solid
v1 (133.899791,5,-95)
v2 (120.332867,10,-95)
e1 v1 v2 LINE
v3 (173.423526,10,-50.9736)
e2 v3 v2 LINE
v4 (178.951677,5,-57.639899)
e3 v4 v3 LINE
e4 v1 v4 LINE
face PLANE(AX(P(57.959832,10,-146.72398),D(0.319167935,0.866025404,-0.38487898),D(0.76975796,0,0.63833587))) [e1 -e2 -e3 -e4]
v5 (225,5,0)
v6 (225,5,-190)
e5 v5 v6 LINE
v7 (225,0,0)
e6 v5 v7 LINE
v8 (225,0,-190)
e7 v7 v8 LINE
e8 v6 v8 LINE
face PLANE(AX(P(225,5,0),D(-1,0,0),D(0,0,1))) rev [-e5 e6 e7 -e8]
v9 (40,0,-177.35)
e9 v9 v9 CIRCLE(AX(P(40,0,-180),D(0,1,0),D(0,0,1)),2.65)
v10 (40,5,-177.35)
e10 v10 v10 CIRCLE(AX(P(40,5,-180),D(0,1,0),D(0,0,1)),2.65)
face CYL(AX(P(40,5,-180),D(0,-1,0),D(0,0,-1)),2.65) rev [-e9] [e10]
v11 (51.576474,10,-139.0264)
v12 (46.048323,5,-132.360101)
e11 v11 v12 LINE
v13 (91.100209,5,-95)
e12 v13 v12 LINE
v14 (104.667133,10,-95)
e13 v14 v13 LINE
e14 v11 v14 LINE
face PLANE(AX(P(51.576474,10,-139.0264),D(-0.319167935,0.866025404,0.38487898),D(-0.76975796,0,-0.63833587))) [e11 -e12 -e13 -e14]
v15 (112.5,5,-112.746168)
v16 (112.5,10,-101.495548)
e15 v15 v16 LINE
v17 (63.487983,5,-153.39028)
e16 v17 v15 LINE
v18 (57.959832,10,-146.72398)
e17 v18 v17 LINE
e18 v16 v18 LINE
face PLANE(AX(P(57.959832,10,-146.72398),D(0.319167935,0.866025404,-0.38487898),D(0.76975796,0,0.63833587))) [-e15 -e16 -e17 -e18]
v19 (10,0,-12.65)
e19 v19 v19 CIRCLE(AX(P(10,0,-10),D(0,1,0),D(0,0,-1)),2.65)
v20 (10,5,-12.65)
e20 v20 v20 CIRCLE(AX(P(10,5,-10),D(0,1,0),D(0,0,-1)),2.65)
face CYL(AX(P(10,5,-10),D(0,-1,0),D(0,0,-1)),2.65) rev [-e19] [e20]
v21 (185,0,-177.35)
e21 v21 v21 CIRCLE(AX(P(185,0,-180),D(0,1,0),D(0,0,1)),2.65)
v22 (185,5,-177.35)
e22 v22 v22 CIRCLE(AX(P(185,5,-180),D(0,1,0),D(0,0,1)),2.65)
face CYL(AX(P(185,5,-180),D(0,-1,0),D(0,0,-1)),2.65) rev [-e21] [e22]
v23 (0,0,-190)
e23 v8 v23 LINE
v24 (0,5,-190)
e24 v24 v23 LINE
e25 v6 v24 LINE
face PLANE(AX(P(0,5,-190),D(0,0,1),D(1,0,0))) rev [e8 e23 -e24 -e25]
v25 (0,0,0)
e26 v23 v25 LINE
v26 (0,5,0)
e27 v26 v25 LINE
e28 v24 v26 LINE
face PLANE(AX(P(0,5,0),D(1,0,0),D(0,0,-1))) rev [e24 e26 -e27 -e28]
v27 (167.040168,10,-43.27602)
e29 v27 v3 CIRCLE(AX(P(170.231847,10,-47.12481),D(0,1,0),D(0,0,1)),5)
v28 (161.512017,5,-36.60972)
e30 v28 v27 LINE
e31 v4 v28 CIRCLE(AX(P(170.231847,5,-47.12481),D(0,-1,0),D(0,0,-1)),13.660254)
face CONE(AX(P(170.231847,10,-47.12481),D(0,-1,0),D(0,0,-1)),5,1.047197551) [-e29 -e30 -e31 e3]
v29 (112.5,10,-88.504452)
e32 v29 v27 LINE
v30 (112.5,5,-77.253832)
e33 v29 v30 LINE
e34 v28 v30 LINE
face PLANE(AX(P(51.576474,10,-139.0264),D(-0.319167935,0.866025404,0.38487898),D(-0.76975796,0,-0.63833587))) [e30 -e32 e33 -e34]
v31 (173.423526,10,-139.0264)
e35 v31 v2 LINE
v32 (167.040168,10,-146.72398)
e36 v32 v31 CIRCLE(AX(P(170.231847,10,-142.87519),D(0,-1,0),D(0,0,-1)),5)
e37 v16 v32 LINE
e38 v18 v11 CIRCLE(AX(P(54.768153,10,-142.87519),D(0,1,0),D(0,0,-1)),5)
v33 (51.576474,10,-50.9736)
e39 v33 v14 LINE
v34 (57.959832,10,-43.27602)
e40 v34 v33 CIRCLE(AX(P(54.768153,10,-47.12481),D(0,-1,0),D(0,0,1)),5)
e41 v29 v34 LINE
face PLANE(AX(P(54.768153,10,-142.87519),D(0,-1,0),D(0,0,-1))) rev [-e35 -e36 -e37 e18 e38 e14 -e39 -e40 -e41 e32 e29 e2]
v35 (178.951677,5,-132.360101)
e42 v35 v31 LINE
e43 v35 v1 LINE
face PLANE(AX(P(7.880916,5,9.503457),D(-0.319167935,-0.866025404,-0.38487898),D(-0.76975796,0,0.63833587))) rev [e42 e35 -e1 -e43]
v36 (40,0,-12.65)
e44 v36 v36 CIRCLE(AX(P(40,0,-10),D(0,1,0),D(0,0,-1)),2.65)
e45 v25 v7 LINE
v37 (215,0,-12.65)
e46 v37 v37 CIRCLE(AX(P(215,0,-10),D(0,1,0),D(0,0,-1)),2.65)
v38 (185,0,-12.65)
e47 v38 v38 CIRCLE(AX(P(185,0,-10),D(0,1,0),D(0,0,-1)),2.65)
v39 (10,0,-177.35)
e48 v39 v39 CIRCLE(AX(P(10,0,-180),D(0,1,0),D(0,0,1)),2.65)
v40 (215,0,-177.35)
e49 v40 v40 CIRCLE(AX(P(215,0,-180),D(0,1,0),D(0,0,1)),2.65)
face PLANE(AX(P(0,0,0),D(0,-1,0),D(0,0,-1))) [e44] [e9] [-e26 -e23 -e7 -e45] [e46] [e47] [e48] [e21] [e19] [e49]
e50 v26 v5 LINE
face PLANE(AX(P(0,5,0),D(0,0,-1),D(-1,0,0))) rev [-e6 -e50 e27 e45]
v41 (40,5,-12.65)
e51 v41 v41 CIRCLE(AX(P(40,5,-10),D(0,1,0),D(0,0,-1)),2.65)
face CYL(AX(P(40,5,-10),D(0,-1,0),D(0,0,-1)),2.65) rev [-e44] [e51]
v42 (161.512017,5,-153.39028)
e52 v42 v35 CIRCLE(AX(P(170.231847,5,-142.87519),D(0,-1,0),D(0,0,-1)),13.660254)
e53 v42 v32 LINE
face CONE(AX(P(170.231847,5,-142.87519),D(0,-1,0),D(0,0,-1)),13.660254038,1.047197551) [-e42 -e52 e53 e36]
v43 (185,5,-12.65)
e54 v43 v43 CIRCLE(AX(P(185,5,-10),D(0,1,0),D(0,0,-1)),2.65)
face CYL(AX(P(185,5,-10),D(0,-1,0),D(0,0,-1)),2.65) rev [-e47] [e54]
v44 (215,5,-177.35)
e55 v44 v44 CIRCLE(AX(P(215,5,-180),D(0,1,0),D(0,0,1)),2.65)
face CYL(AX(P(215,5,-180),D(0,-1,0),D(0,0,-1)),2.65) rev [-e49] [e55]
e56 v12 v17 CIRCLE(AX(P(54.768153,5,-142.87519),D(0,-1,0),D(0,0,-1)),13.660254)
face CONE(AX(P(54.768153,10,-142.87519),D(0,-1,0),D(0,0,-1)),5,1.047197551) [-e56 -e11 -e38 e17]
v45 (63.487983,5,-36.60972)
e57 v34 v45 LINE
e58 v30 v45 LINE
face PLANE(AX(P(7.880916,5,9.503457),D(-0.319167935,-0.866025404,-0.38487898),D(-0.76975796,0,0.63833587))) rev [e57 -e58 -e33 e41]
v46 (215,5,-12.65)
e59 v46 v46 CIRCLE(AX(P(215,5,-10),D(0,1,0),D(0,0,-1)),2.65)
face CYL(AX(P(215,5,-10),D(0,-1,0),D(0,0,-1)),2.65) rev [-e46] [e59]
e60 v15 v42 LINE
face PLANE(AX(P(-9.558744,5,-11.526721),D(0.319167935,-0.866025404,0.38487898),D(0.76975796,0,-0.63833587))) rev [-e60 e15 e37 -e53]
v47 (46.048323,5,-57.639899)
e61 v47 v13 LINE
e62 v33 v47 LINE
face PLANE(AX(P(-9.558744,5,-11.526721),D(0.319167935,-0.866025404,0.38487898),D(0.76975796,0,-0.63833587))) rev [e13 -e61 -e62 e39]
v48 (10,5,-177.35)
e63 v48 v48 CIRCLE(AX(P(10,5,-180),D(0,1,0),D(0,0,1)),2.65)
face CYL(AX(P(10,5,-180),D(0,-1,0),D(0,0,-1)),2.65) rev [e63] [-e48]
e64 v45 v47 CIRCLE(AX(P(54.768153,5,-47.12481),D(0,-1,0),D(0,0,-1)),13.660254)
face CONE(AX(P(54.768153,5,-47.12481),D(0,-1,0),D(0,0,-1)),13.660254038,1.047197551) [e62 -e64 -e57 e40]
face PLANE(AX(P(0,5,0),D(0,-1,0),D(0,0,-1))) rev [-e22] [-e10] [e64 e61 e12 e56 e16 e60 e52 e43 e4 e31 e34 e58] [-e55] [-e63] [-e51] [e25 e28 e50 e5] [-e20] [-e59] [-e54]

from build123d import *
from OCP.BRepFilletAPI import BRepFilletAPI_MakeChamfer

# Parameters (mm, degrees)
SKETCH1_W           = 225
SKETCH1_H           = 190
SKETCH1_R           = 2.65
BOSS_EXTRUDE1_DEPTH = 5
BOSS_EXTRUDE2_DEPTH = 5
CHAMFER1_SIZE       = 8.660254038
CHAMFER1_SIZE_2     = 5


with BuildPart() as part:
    # Sketch1 → Boss-Extrude1 (new body)
    with BuildSketch(Plane(origin=(0, 0, 0), x_dir=(1, 0, 0), z_dir=(0, 1, 0))):
        with Locations((112.5, 95)):
            Rectangle(SKETCH1_W, SKETCH1_H)
        with Locations(Location((10, 180, 0), (0, 0, 270))):
            Circle(SKETCH1_R, mode=Mode.SUBTRACT)
        with Locations(Location((40, 180, 0), (0, 0, 270))):
            Circle(SKETCH1_R, mode=Mode.SUBTRACT)
        with Locations(Location((185, 180, 0), (0, 0, 270))):
            Circle(SKETCH1_R, mode=Mode.SUBTRACT)
        with Locations(Location((215, 180, 0), (0, 0, 270))):
            Circle(SKETCH1_R, mode=Mode.SUBTRACT)
        with Locations(Location((215, 10, 0), (0, 0, 90))):
            Circle(SKETCH1_R, mode=Mode.SUBTRACT)
        with Locations(Location((185, 10, 0), (0, 0, 90))):
            Circle(SKETCH1_R, mode=Mode.SUBTRACT)
        with Locations(Location((40, 10, 0), (0, 0, 90))):
            Circle(SKETCH1_R, mode=Mode.SUBTRACT)
        with Locations(Location((10, 10, 0), (0, 0, 90))):
            Circle(SKETCH1_R, mode=Mode.SUBTRACT)
    extrude(amount=BOSS_EXTRUDE1_DEPTH)

    # Sketch2 → Boss-Extrude2 (add)
    with BuildSketch(Plane(origin=(0, 5, 0), x_dir=(1, 0, 0), z_dir=(0, 1, 0))):
        with BuildLine():
            Line((51.576473623, 139.026400418), (167.040167682, 43.276019978))
            ThreePointArc((167.040167682, 43.276019978), (174.080636831, 43.933130432), (173.423526377, 50.973599582))
            Line((173.423526377, 50.973599582), (57.959832318, 146.723980022))
            ThreePointArc((57.959832318, 146.723980022), (50.919363169, 146.066869568), (51.576473623, 139.026400418))
        make_face()
    boss_extrude2 = extrude(amount=BOSS_EXTRUDE2_DEPTH)

    # Mirror1: Boss-Extrude2 across plane
    add(boss_extrude2.mirror(Plane(origin=(0, 0, -95), x_dir=(1, 0, 0), z_dir=(0, 0, -1))))

    # Chamfer1
    chamfer1_edges_1 = [part.edges().sort_by_distance(p)[0] for p in [
        (139.770083841, 5, -65.890235846),
    ]]
    chamfer1_side_1 = [part.faces().sort_by_distance(p)[0] for p in [
        (139.706250254, 5, -65.81326005),
    ]]
    chamfer1_edges_2 = [part.edges().sort_by_distance(p)[0] for p in [
        (174.080636831, 5, -43.933130432),
    ]]
    chamfer1_side_2 = [part.faces().sort_by_distance(p)[0] for p in [
        (174.157612628, 5, -43.869296845),
    ]]
    chamfer1_edges_3 = [part.edges().sort_by_distance(p)[0] for p in [
        (146.878196714, 5, -72.986799791),
    ]]
    chamfer1_side_3 = [part.faces().sort_by_distance(p)[0] for p in [
        (146.942030301, 5, -73.063775587),
    ]]
    chamfer1_edges_4 = [part.edges().sort_by_distance(p)[0] for p in [
        (146.878196714, 5, -117.013200209),
    ]]
    chamfer1_side_4 = [part.faces().sort_by_distance(p)[0] for p in [
        (146.942030301, 5, -116.936224413),
    ]]
    chamfer1_edges_5 = [part.edges().sort_by_distance(p)[0] for p in [
        (174.080636831, 5, -146.066869568),
    ]]
    chamfer1_side_5 = [part.faces().sort_by_distance(p)[0] for p in [
        (174.157612628, 5, -146.130703155),
    ]]
    chamfer1_edges_6 = [part.edges().sort_by_distance(p)[0] for p in [
        (139.770083841, 5, -124.109764154),
    ]]
    chamfer1_side_6 = [part.faces().sort_by_distance(p)[0] for p in [
        (139.706250254, 5, -124.18673995),
    ]]
    chamfer1_edges_7 = [part.edges().sort_by_distance(p)[0] for p in [
        (85.229916159, 5, -124.109764154),
    ]]
    chamfer1_side_7 = [part.faces().sort_by_distance(p)[0] for p in [
        (85.293749746, 5, -124.18673995),
    ]]
    chamfer1_edges_8 = [part.edges().sort_by_distance(p)[0] for p in [
        (85.229916159, 5, -65.890235846),
    ]]
    chamfer1_side_8 = [part.faces().sort_by_distance(p)[0] for p in [
        (85.293749746, 5, -65.81326005),
    ]]
    chamfer1_edges_9 = [part.edges().sort_by_distance(p)[0] for p in [
        (50.919363169, 5, -146.066869568),
    ]]
    chamfer1_side_9 = [part.faces().sort_by_distance(p)[0] for p in [
        (50.842387372, 5, -146.130703155),
    ]]
    chamfer1_edges_10 = [part.edges().sort_by_distance(p)[0] for p in [
        (50.919363169, 5, -43.933130432),
    ]]
    chamfer1_side_10 = [part.faces().sort_by_distance(p)[0] for p in [
        (50.842387372, 5, -43.869296845),
    ]]
    chamfer1_edges_11 = [part.edges().sort_by_distance(p)[0] for p in [
        (78.121803286, 5, -117.013200209),
    ]]
    chamfer1_side_11 = [part.faces().sort_by_distance(p)[0] for p in [
        (78.057969699, 5, -116.936224413),
    ]]
    chamfer1_edges_12 = [part.edges().sort_by_distance(p)[0] for p in [
        (78.121803286, 5, -72.986799791),
    ]]
    chamfer1_side_12 = [part.faces().sort_by_distance(p)[0] for p in [
        (78.057969699, 5, -73.063775587),
    ]]
    chamfer1 = BRepFilletAPI_MakeChamfer(part.part.solid().wrapped)
    for e in chamfer1_edges_1:
        chamfer1.Add(CHAMFER1_SIZE - 0.0001, CHAMFER1_SIZE_2 - 0.0001, e.wrapped, chamfer1_side_1[0].wrapped)
    for e in chamfer1_edges_2:
        chamfer1.Add(CHAMFER1_SIZE - 0.0001, CHAMFER1_SIZE_2 - 0.0001, e.wrapped, chamfer1_side_2[0].wrapped)
    for e in chamfer1_edges_3:
        chamfer1.Add(CHAMFER1_SIZE - 0.0001, CHAMFER1_SIZE_2 - 0.0001, e.wrapped, chamfer1_side_3[0].wrapped)
    for e in chamfer1_edges_4:
        chamfer1.Add(CHAMFER1_SIZE - 0.0001, CHAMFER1_SIZE_2 - 0.0001, e.wrapped, chamfer1_side_4[0].wrapped)
    for e in chamfer1_edges_5:
        chamfer1.Add(CHAMFER1_SIZE - 0.0001, CHAMFER1_SIZE_2 - 0.0001, e.wrapped, chamfer1_side_5[0].wrapped)
    for e in chamfer1_edges_6:
        chamfer1.Add(CHAMFER1_SIZE - 0.0001, CHAMFER1_SIZE_2 - 0.0001, e.wrapped, chamfer1_side_6[0].wrapped)
    for e in chamfer1_edges_7:
        chamfer1.Add(CHAMFER1_SIZE - 0.0001, CHAMFER1_SIZE_2 - 0.0001, e.wrapped, chamfer1_side_7[0].wrapped)
    for e in chamfer1_edges_8:
        chamfer1.Add(CHAMFER1_SIZE - 0.0001, CHAMFER1_SIZE_2 - 0.0001, e.wrapped, chamfer1_side_8[0].wrapped)
    for e in chamfer1_edges_9:
        chamfer1.Add(CHAMFER1_SIZE - 0.0001, CHAMFER1_SIZE_2 - 0.0001, e.wrapped, chamfer1_side_9[0].wrapped)
    for e in chamfer1_edges_10:
        chamfer1.Add(CHAMFER1_SIZE - 0.0001, CHAMFER1_SIZE_2 - 0.0001, e.wrapped, chamfer1_side_10[0].wrapped)
    for e in chamfer1_edges_11:
        chamfer1.Add(CHAMFER1_SIZE - 0.0001, CHAMFER1_SIZE_2 - 0.0001, e.wrapped, chamfer1_side_11[0].wrapped)
    for e in chamfer1_edges_12:
        chamfer1.Add(CHAMFER1_SIZE - 0.0001, CHAMFER1_SIZE_2 - 0.0001, e.wrapped, chamfer1_side_12[0].wrapped)
    add(Compound.cast(chamfer1.Shape()), mode=Mode.REPLACE)  # a hair under: the kernel refuses the full size


solid = part.part
